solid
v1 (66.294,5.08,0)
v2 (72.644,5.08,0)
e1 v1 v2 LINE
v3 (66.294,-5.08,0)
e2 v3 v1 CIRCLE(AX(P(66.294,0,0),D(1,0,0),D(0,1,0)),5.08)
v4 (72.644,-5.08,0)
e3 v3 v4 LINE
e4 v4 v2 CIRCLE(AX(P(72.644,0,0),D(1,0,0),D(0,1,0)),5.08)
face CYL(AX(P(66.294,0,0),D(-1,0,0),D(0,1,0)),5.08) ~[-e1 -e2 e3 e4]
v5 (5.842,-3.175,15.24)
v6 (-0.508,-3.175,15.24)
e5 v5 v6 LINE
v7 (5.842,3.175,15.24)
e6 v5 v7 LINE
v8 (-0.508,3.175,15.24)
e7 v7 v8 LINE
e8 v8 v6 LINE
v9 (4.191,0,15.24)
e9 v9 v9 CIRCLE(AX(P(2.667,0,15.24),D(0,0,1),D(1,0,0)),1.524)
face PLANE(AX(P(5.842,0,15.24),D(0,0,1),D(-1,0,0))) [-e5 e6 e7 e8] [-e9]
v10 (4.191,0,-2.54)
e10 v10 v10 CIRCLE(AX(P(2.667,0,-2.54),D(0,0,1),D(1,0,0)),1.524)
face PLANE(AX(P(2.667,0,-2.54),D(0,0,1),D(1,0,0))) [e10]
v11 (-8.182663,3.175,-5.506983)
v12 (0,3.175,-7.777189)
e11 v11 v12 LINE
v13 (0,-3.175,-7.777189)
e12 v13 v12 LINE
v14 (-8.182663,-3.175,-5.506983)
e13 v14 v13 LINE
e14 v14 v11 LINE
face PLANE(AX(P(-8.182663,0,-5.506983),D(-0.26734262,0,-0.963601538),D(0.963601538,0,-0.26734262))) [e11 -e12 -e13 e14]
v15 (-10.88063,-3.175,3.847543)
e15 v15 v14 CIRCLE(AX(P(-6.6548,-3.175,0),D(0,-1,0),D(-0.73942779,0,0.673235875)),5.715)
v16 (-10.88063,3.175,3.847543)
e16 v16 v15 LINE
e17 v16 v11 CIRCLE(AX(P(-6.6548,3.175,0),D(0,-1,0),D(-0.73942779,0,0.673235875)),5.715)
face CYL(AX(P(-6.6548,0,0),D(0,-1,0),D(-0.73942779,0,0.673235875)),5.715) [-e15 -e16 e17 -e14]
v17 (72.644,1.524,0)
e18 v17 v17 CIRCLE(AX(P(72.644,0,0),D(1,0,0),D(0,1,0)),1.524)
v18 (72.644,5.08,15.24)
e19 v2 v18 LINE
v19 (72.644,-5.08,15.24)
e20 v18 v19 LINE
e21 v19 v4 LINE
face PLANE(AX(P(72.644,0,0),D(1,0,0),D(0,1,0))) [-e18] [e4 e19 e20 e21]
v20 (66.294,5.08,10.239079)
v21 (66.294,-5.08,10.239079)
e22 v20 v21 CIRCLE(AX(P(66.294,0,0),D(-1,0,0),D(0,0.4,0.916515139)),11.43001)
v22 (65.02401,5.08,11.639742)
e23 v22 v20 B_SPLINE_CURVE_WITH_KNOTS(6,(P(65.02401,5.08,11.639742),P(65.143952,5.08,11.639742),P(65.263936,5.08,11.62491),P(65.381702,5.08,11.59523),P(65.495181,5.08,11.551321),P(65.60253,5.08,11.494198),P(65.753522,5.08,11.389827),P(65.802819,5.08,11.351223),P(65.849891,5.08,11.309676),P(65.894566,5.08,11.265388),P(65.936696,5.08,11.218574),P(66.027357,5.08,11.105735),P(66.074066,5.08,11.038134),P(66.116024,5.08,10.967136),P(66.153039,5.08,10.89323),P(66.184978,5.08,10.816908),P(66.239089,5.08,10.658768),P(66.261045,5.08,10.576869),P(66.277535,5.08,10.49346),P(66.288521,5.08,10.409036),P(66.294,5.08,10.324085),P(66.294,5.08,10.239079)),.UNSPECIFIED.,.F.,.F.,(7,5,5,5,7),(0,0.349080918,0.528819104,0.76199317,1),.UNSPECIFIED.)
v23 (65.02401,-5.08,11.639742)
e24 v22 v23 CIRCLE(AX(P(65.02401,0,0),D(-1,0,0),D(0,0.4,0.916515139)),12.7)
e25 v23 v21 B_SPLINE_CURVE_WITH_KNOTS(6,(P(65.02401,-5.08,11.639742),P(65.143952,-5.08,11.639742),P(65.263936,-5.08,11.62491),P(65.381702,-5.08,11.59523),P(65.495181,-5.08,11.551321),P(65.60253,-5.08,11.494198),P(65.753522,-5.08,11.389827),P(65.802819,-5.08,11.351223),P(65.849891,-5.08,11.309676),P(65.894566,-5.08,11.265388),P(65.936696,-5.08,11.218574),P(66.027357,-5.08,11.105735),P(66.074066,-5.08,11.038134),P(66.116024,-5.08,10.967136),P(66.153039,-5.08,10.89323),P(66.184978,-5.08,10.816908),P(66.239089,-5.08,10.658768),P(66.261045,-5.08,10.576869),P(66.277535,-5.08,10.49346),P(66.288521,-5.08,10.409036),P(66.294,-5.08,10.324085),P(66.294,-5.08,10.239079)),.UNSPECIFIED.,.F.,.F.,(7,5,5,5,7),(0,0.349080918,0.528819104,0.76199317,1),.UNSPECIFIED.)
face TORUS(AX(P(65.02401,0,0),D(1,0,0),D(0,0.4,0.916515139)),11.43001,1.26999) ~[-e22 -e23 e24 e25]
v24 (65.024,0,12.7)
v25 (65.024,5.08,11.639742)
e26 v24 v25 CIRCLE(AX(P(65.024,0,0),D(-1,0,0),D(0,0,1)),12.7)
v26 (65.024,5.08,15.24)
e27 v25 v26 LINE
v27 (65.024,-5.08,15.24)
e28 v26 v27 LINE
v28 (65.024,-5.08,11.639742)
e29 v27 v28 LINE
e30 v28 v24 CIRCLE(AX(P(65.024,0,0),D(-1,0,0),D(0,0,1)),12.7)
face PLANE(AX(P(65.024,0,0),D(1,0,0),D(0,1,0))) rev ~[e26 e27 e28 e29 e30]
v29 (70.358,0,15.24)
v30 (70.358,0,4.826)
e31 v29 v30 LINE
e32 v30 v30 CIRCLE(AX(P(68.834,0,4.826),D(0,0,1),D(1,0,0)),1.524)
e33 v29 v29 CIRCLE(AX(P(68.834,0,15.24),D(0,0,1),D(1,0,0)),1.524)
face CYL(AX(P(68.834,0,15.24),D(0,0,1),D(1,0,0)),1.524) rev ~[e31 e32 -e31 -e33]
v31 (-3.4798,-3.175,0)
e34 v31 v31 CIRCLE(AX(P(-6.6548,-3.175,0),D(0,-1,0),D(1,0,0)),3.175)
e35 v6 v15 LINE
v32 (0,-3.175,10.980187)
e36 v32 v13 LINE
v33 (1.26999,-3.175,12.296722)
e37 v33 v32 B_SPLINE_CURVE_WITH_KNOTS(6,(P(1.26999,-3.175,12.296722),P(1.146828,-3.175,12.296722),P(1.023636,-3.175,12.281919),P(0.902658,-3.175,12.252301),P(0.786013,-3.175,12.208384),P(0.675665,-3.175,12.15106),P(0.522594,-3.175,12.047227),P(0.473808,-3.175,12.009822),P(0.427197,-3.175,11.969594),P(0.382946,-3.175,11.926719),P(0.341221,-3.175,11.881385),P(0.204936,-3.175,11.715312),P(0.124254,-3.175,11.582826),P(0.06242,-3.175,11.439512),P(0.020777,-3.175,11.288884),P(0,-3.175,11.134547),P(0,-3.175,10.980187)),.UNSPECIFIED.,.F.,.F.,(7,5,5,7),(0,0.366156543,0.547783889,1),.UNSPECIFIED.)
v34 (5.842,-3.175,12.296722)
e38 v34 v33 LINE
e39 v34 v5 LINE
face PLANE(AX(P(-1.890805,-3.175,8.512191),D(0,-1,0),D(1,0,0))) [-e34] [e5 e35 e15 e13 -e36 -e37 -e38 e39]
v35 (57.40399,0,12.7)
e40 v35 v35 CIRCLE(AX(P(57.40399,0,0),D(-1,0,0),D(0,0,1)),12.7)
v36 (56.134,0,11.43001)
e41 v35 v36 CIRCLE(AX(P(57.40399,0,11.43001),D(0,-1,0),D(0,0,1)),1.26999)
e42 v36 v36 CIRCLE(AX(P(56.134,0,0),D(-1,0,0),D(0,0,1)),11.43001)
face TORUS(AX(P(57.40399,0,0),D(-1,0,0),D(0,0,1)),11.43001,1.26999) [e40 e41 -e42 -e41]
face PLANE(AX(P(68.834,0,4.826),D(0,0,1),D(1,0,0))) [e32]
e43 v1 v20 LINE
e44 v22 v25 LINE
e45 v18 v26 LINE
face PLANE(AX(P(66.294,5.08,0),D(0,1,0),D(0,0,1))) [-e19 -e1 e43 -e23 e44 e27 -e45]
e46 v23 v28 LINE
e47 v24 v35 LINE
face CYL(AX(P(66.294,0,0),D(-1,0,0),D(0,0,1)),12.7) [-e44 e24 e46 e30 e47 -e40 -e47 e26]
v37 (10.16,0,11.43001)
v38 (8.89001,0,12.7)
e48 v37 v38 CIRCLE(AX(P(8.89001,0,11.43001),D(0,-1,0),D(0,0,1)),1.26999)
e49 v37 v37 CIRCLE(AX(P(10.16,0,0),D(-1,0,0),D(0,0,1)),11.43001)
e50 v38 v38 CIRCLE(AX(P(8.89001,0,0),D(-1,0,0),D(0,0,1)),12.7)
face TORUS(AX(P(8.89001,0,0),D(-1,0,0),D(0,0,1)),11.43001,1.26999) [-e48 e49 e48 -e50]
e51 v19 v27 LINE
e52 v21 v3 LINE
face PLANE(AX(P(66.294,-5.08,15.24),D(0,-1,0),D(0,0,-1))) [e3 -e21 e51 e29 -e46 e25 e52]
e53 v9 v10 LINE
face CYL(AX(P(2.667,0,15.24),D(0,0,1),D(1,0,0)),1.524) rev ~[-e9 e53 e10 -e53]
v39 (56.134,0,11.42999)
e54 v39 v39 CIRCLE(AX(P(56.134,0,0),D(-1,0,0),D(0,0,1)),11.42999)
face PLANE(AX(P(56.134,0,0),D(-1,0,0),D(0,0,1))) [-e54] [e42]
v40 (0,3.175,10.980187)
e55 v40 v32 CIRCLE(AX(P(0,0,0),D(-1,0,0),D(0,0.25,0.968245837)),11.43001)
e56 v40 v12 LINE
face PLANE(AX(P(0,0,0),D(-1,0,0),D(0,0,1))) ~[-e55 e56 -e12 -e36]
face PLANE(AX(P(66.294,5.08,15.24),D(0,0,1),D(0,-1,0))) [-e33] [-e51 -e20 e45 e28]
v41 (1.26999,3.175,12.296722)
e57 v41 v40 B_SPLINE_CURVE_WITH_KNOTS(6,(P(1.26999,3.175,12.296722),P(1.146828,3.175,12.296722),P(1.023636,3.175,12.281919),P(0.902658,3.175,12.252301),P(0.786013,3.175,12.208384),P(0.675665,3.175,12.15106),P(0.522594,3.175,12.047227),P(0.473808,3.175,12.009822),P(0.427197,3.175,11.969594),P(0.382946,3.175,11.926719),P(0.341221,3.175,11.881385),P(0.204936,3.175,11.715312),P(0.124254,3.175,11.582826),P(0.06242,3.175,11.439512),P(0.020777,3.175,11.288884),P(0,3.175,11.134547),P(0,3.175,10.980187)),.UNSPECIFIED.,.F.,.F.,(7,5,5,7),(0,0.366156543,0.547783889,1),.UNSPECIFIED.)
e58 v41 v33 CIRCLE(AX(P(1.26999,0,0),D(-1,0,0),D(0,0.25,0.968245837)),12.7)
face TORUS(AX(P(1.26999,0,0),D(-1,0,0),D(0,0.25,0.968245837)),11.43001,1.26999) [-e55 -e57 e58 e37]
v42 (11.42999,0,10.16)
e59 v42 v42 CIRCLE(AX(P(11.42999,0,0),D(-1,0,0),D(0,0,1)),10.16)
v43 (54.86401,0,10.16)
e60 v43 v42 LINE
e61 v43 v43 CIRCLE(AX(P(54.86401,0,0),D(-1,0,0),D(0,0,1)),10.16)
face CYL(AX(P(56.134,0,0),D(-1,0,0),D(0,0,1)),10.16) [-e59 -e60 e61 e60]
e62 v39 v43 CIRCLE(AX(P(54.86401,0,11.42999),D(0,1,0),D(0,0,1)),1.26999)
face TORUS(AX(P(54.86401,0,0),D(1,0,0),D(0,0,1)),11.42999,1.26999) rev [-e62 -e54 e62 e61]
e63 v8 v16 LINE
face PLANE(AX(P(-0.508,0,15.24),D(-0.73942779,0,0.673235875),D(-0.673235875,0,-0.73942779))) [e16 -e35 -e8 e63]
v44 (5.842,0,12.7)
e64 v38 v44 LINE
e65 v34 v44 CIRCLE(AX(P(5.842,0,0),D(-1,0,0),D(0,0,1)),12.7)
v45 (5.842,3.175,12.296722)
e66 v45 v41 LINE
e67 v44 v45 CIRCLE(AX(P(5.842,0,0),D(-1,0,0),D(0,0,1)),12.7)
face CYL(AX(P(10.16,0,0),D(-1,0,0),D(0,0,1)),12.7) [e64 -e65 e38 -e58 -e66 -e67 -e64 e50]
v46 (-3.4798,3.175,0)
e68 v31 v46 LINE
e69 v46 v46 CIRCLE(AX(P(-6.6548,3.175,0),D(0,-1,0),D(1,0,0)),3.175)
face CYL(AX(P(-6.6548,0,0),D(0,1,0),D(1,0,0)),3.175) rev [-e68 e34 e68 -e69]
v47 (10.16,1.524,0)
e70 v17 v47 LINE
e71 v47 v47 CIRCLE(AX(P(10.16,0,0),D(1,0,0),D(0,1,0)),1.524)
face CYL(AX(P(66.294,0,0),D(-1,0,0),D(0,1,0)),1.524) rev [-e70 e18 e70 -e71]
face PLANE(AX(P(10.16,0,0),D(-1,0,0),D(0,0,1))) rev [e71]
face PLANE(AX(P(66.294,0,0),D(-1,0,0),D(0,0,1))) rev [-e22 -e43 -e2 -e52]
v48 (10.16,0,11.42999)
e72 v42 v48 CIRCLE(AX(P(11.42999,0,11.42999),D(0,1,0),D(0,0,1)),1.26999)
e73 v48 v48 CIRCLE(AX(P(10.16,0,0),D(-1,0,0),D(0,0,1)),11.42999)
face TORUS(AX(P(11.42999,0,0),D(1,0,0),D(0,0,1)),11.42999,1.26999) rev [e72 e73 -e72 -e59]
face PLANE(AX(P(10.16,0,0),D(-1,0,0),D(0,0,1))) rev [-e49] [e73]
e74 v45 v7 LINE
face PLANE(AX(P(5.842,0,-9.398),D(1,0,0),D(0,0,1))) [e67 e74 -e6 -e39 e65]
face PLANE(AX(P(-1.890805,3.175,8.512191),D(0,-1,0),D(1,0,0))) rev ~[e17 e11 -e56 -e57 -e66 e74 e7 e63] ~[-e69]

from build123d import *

# Parameters (mm, degrees)
F0_W          = 5.842
F0_H          = 12.7
F0_R          = 3.175
F2_DEPTH      = 3.175
F3_R          = 1.524
F4_DEPTH      = 6.35
F4_DEPTH_BACK = 1.27
F5_DEPTH      = 56.134
F6_R          = 1.524
F7_DEPTH      = 17.78
F8_DEPTH      = 10.414
F9_R          = 1.26999


# Not quite as in the source:
# - a fillet or chamfer is up to 0.001 mm smaller than in the source, because OpenCascade refuses the exact size


with BuildPart() as f1:
    # F0 (on Front) → F1 (revolve)
    with BuildSketch(Plane.XZ):
        with Locations((2.921, 6.35)):
            Rectangle(F0_W, F0_H)
        Polygon((5.842, 12.7), (5.842, 0), (66.294, 0), (66.294, 12.7), (56.134, 12.7), (56.134, 10.16), (10.16, 10.16), (10.16, 12.7), align=None)
    revolve(axis=Axis((33.147, 0, 0), (-1, 0, 0)))

    # F0 (on Front) → F2 (join, symmetric)
    with BuildSketch(Plane.XZ):
        with BuildLine():
            Line((-0.9398, 0), (0, 0))
            Line((0, 0), (0, 12.7))
            Line((0, 12.7), (5.842, 12.7))
            Line((5.842, 12.7), (5.842, 15.24))
            Line((5.842, 15.24), (-0.508, 15.24))
            Line((-0.508, 15.24), (-10.8806298187, 3.8475430269))
            ThreePointArc((-10.8806298187, 3.8475430269), (-4.5919612295, 5.3297205562), (-0.9398, 0))
        make_face()
        with Locations((2.921, 6.35)):
            Rectangle(F0_W, F0_H)
        with BuildLine():
            Line((5.842, 0), (0, 0))
            Line((0, 0), (-0.9398, 0))
            ThreePointArc((-0.9398, 0), (-3.1957909266, -4.5493385486), (-8.1826630726, -5.5069827884))
            Line((-8.1826630726, -5.5069827884), (5.842, -9.398))
            Line((5.842, -9.398), (5.842, 0))
        make_face()
        with BuildLine():
            ThreePointArc((-8.1826630726, -5.5069827884), (-3.1957909266, -4.5493385486), (-0.9398, 0))
            ThreePointArc((-0.9398, 0), (-4.5919612295, 5.3297205562), (-10.8806298187, 3.8475430269))
            ThreePointArc((-10.8806298187, 3.8475430269), (-12.1459778134, -1.5837270034), (-8.1826630726, -5.5069827884))
        make_face()
        with Locations((-6.6548, 0)):
            Circle(F0_R, mode=Mode.SUBTRACT)
    extrude(amount=F2_DEPTH, both=True)

    # F3 (on face) → F4 (join, two sides)
    with BuildSketch(Plane.YZ.offset(66.294)) as f4_sk:
        with BuildLine():
            ThreePointArc((-5.08, 0), (0, -5.08), (5.08, 0))
            ThreePointArc((5.08, 0), (0, 5.08), (-5.08, 0))
        make_face()
        Circle(F3_R, mode=Mode.SUBTRACT)
        with BuildLine():
            ThreePointArc((-5.08, 11.6397422652), (0, 12.7), (5.08, 11.6397422652))
            Line((5.08, 11.6397422652), (5.08, 15.24))
            Line((5.08, 15.24), (-5.08, 15.24))
            Line((-5.08, 15.24), (-5.08, 11.6397422652))
        make_face()
        with BuildLine():
            ThreePointArc((-5.08, 0), (0, 5.08), (5.08, 0))
            Line((5.08, 0), (5.08, 11.6397422652))
            ThreePointArc((5.08, 11.6397422652), (0, 12.7), (-5.08, 11.6397422652))
            Line((-5.08, 11.6397422652), (-5.08, 0))
        make_face()
    extrude(amount=F4_DEPTH)
    extrude(f4_sk.sketch, amount=-F4_DEPTH_BACK)

    # F5 (cut, through all): a face of the model
    f5_faces = [f1.faces().sort_by_distance(p)[0] for p in [
        (66.294, 0, 0),
    ]]
    extrude(f5_faces, amount=-F5_DEPTH, mode=Mode.SUBTRACT)

    # F6 (on face) → F7 (cut)
    with BuildSketch(Plane.XY.offset(15.24)):
        with Locations((2.667, 0)):
            Circle(F6_R)
    extrude(amount=-F7_DEPTH, mode=Mode.SUBTRACT)

    # F6 (on face) → F8 (cut)
    with BuildSketch(Plane.XY.offset(15.24)):
        with Locations((68.834, 0)):
            Circle(F6_R)
    extrude(amount=-F8_DEPTH, mode=Mode.SUBTRACT)

    # F9 (radius 1.27 in the source; OpenCascade refuses exactly that, so slightly less here)
    f9_edges = [f1.edges().sort_by_distance(p)[0] for p in [
        (10.16, 0, -12.7),
        (56.134, 0, -12.7),
        (10.16, 0, -10.16),
        (56.134, 0, -10.16),
        (66.294, 0, -12.7),
        (0, 0, -12.7),
    ]]
    fillet(f9_edges, radius=F9_R)


solid = f1.part
